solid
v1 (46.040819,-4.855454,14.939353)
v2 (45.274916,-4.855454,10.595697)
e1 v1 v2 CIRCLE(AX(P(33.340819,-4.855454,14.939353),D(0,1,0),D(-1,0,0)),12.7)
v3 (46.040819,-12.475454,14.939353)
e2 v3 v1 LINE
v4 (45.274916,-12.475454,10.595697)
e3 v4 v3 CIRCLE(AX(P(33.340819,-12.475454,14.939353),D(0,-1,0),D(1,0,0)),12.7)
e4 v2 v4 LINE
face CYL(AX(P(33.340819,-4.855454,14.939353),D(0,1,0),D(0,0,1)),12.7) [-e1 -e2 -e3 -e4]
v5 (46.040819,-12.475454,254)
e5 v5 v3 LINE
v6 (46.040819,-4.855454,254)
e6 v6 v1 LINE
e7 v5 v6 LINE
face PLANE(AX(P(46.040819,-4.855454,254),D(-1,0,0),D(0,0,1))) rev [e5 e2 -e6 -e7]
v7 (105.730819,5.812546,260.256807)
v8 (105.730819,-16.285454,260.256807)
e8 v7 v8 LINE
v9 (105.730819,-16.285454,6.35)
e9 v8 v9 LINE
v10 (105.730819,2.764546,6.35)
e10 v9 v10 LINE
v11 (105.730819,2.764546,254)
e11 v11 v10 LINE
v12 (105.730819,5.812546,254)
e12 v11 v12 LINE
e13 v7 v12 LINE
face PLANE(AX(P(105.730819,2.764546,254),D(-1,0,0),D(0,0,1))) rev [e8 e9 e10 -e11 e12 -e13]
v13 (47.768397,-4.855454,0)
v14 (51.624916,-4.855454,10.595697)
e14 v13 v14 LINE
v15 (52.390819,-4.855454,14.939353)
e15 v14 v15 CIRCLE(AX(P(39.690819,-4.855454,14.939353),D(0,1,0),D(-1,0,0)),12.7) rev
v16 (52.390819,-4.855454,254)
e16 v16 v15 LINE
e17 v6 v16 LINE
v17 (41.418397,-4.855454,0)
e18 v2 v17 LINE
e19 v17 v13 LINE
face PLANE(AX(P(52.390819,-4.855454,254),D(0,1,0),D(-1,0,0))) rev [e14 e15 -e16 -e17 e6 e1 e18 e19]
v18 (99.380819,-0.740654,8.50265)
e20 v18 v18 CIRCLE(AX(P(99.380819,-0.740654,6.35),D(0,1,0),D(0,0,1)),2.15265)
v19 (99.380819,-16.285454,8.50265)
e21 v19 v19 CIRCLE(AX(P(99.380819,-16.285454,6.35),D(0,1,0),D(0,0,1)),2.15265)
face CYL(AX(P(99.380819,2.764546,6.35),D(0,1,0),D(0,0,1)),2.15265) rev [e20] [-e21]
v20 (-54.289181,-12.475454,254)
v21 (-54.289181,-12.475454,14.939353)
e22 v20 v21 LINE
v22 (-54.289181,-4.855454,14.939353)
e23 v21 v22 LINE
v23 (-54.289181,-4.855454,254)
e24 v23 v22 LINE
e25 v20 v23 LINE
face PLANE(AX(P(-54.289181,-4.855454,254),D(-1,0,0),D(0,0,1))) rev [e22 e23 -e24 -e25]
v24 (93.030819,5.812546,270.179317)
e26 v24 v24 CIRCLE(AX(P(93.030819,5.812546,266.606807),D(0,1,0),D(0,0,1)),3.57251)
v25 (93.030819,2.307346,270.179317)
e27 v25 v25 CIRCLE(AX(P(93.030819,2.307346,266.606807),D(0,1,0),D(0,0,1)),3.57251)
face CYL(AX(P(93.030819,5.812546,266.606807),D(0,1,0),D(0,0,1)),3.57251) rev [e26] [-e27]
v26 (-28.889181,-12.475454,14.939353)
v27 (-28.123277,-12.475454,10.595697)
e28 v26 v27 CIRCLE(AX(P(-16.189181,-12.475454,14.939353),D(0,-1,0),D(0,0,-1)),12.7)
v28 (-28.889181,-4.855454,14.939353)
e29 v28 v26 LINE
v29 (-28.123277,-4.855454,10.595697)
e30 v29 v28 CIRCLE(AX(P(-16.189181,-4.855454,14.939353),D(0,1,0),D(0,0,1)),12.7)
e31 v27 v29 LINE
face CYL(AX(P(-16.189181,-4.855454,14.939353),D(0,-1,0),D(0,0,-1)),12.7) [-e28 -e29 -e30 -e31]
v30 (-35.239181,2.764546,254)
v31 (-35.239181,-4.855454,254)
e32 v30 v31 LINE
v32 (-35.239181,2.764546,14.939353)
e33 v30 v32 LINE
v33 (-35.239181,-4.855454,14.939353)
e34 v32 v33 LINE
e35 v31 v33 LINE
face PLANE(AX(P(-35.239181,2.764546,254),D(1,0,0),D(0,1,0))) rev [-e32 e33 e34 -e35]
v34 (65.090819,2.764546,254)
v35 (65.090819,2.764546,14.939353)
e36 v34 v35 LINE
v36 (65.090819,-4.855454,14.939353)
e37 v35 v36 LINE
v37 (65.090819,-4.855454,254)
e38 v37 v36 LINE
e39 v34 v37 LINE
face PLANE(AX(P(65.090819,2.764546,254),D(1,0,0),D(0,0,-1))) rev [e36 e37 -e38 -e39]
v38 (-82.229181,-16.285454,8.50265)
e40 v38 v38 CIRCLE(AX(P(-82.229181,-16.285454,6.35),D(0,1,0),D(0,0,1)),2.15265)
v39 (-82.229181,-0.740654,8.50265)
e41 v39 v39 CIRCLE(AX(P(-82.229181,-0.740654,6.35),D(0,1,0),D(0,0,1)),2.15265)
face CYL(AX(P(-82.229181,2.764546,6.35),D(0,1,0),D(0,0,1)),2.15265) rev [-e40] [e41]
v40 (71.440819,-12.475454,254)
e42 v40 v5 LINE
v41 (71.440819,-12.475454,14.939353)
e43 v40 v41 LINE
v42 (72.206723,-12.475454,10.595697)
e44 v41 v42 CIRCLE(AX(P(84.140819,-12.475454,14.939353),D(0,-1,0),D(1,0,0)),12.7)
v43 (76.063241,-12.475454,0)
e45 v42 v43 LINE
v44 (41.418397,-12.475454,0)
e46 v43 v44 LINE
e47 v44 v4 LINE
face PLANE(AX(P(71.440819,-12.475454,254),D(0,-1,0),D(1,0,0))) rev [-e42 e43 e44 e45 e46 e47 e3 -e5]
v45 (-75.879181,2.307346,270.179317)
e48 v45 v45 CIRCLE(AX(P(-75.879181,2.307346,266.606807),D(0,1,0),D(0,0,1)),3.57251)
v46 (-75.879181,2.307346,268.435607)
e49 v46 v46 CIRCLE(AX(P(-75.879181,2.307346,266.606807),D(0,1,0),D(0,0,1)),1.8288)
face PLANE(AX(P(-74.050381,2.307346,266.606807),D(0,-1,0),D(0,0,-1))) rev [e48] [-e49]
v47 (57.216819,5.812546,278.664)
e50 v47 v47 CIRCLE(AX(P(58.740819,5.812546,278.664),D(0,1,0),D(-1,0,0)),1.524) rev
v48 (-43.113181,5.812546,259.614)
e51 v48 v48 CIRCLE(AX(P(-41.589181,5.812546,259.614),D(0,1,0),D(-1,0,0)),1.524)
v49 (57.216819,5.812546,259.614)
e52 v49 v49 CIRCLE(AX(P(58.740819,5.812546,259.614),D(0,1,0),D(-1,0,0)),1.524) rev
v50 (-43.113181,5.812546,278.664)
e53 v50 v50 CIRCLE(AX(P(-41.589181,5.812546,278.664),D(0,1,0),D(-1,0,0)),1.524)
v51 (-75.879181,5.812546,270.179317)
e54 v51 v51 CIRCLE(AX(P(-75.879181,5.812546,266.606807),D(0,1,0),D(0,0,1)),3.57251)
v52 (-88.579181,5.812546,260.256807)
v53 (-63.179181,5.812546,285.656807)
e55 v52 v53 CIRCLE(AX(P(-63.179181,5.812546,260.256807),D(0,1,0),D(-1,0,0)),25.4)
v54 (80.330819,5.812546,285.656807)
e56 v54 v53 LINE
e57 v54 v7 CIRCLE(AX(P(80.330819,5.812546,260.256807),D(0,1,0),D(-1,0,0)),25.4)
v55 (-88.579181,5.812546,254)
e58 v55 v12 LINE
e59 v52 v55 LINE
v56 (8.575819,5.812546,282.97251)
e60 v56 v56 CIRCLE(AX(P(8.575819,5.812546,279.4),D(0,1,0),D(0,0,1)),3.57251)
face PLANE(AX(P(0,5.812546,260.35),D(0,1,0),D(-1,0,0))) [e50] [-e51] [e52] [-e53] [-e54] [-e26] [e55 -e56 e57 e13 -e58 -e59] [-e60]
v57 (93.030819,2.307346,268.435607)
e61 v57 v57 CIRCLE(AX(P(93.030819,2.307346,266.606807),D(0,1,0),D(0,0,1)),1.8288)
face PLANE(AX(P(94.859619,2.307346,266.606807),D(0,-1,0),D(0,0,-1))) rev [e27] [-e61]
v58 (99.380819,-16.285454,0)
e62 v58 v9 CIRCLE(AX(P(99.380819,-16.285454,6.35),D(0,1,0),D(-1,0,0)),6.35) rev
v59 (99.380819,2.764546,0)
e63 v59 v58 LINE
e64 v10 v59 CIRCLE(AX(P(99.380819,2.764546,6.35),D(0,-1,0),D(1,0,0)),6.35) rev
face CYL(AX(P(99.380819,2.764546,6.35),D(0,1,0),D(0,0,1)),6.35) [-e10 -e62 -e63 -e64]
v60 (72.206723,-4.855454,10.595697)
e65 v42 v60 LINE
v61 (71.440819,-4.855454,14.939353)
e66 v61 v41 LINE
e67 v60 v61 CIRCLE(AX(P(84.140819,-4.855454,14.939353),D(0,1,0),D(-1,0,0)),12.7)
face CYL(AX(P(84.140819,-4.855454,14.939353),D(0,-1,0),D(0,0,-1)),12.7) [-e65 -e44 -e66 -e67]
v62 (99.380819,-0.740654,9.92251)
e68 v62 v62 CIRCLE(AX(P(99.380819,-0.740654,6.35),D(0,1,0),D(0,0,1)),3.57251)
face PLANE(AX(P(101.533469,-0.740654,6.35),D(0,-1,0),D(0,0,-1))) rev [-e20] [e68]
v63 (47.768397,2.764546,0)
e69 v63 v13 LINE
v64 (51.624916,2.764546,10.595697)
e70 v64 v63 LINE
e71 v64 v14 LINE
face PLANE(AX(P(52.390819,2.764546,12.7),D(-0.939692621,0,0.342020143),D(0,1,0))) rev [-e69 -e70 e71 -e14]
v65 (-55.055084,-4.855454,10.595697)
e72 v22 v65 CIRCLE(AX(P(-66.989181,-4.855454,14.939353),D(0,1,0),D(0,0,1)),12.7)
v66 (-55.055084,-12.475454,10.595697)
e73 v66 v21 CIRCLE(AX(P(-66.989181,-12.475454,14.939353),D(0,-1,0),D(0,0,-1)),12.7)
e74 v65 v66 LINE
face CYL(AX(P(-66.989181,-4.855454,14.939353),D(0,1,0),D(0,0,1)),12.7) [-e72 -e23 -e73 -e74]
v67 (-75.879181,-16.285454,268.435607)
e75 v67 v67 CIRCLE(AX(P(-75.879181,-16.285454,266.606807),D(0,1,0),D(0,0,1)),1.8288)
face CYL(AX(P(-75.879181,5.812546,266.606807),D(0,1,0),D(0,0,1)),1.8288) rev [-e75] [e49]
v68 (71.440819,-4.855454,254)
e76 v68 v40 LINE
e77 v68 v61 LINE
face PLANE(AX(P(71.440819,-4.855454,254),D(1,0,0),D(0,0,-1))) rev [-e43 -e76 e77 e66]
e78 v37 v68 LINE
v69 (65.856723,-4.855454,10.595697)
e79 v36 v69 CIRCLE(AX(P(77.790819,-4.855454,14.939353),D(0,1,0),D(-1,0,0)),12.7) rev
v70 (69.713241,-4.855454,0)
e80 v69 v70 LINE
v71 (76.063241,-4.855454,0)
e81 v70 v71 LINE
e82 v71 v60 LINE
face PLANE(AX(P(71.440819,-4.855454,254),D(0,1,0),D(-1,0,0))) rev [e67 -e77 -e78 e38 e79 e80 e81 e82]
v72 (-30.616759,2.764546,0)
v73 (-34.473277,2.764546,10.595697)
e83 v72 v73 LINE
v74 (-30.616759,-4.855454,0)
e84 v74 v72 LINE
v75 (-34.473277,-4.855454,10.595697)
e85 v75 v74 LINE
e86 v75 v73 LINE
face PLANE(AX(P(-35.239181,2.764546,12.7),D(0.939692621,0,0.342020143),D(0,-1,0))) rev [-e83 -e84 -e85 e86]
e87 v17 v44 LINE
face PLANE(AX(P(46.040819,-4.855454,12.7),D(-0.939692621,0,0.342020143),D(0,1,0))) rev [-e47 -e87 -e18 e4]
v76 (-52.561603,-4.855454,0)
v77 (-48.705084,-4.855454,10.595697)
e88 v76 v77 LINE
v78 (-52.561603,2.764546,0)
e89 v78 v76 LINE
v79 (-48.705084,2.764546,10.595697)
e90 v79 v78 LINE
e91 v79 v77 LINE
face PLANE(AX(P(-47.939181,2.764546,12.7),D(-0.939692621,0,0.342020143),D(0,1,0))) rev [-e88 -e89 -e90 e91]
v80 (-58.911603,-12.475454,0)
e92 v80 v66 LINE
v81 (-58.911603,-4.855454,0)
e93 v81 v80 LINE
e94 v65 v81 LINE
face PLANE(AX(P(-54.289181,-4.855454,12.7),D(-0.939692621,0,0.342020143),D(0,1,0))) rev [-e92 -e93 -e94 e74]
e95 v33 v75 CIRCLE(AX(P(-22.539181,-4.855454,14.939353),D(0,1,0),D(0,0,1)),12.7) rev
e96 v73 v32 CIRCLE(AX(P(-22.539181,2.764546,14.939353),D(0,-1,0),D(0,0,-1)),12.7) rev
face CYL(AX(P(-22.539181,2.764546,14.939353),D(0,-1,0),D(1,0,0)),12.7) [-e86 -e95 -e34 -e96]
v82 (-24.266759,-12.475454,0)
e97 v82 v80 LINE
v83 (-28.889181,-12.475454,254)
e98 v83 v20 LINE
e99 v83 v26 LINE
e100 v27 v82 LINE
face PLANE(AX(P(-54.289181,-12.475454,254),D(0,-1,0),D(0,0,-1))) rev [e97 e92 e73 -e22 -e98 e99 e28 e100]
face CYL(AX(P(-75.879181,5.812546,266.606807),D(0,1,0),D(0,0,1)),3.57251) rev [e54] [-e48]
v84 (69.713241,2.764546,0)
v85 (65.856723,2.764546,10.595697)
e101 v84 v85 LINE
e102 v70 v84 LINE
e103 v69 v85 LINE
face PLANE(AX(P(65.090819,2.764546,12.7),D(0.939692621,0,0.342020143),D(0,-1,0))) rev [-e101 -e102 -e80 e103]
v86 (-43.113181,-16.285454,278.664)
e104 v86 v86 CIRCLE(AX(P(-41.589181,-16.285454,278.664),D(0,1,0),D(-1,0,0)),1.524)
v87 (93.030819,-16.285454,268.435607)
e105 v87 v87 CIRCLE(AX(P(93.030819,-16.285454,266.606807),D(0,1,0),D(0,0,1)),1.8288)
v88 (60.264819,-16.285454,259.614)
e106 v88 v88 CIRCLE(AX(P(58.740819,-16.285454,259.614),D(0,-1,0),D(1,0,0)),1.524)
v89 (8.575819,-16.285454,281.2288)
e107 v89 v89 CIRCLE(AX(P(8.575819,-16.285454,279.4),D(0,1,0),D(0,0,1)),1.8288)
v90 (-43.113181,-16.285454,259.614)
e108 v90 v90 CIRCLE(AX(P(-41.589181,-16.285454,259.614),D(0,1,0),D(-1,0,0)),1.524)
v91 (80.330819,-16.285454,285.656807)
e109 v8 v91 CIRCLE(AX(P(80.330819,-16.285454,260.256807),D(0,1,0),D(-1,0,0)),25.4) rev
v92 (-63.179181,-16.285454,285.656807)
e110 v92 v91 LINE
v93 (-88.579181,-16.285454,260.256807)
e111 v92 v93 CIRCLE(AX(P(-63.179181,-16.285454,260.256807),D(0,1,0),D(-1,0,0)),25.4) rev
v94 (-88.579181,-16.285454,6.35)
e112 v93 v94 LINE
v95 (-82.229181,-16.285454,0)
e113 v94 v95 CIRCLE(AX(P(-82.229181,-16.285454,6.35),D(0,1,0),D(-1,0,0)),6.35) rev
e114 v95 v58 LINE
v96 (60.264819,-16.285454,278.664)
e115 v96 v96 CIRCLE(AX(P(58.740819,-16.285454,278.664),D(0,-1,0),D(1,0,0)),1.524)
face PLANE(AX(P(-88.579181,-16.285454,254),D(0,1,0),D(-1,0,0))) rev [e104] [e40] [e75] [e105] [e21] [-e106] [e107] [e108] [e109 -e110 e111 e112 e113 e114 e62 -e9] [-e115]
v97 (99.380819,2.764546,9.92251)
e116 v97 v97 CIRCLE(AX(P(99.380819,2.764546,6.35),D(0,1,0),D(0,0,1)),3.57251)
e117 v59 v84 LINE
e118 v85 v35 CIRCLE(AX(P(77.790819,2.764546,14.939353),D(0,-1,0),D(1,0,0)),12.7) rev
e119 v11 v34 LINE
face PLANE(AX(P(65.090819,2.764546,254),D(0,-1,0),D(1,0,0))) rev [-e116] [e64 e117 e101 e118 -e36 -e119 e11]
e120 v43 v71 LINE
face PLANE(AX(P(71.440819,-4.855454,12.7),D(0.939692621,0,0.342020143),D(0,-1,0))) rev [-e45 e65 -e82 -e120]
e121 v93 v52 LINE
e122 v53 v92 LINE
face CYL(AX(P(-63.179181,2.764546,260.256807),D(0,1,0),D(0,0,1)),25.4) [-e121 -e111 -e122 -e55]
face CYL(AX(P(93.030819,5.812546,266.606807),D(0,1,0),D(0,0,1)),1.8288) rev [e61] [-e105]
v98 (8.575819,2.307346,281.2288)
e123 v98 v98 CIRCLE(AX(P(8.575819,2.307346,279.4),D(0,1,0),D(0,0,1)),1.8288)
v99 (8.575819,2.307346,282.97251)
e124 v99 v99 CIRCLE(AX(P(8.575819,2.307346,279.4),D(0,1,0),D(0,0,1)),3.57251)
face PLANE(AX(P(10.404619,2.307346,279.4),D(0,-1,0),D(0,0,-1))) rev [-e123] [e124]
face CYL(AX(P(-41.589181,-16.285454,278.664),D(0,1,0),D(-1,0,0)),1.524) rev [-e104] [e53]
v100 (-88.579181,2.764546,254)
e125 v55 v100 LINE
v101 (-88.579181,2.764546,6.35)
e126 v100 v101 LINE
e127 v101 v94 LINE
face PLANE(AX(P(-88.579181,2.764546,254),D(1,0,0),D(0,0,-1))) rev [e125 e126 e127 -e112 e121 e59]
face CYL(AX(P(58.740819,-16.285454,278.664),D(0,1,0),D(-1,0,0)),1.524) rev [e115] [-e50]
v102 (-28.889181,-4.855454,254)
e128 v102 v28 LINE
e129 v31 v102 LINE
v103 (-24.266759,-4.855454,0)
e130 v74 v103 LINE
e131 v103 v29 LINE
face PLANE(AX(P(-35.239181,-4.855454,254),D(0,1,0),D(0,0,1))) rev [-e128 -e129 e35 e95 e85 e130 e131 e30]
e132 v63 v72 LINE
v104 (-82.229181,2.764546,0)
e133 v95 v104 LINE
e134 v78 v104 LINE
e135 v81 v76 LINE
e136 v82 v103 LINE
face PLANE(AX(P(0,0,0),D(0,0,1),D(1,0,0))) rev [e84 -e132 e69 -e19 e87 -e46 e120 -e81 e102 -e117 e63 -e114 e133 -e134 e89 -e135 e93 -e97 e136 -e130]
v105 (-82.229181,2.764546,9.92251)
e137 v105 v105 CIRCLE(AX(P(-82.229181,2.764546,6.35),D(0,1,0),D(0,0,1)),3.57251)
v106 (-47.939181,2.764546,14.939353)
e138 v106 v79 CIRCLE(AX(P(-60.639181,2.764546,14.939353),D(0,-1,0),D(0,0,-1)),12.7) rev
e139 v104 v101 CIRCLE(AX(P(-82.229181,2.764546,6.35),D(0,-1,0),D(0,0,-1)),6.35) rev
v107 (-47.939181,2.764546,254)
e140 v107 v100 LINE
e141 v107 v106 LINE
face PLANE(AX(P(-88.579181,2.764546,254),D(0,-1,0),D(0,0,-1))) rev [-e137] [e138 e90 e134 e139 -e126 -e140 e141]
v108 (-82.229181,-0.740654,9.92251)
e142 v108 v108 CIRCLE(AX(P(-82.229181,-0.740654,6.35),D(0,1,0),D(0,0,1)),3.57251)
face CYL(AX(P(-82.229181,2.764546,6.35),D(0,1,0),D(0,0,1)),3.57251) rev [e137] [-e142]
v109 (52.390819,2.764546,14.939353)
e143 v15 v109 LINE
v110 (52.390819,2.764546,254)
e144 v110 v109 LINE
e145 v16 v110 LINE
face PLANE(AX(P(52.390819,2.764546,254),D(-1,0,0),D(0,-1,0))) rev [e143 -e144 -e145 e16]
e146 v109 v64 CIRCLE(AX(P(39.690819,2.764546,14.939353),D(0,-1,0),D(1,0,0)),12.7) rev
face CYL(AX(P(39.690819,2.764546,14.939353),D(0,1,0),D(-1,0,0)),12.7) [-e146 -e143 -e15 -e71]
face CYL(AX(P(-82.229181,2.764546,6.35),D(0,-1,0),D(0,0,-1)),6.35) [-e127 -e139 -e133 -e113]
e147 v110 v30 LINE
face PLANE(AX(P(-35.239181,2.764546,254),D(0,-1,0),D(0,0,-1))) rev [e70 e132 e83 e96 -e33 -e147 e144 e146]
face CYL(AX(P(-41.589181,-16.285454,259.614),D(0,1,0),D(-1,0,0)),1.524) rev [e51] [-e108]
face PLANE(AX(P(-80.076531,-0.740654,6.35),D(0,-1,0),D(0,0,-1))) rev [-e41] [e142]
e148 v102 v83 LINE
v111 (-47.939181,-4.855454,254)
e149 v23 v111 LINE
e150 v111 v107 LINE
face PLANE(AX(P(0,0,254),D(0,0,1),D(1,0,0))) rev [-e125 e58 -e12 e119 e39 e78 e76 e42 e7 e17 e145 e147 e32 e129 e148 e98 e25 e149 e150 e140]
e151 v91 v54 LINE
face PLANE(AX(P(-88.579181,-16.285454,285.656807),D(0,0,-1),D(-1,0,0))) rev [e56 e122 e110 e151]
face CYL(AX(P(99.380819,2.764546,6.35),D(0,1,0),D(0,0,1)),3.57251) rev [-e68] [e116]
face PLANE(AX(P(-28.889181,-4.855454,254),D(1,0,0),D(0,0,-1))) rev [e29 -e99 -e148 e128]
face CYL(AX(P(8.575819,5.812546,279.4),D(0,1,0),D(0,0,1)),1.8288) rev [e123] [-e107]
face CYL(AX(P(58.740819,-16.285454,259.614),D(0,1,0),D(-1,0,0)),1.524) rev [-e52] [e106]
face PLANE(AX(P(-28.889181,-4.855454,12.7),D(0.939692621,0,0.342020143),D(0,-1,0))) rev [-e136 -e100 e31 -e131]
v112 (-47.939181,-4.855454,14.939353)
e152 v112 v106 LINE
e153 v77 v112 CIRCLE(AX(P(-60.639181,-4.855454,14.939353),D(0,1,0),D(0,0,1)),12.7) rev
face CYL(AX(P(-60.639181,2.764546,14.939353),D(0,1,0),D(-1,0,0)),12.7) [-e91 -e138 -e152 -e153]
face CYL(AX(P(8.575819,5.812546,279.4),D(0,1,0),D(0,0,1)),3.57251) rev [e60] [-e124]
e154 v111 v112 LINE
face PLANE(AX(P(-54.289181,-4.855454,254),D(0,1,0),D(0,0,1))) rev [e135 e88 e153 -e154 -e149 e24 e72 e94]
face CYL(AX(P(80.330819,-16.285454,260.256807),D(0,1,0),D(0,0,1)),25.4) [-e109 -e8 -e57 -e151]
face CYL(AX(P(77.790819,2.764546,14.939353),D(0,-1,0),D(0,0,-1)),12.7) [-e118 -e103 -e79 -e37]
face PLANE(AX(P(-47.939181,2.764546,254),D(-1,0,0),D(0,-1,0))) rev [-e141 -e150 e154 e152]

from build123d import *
from OCP.BRepFilletAPI import BRepFilletAPI_MakeChamfer

# Parameters (mm, degrees)
BOSS_EXTRUDE1_DEPTH                            = 254
SKETCH2_W                                      = 194.31
SKETCH2_H                                      = 44.45
SKETCH2_W_2                                    = 35.56
SKETCH2_H_2                                    = 17.018
BOSS_EXTRUDE2_DEPTH                            = 6.35
BOSS_EXTRUDE3_DEPTH                            = 44.45
CUT_EXTRUDE1_DEPTH                             = 324.390875065
CUT_EXTRUDE1_DEPTH_BACK                        = 324.390875065
SKETCH5_R                                      = 1.524
FILLET1_R                                      = 3.175
FILLET2_R                                      = 3.175
CBORE_FOR_6_SOCKET_HEAD_CAP_SCREW1_D           = 4.3053
CBORE_FOR_6_SOCKET_HEAD_CAP_SCREW1_CBORE_D     = 7.14502
CBORE_FOR_6_SOCKET_HEAD_CAP_SCREW1_CBORE_DEPTH = 3.5052
CHAMFER1_SIZE                                  = 12.7
CHAMFER1_SIZE2                                 = 4.622421975
FILLET4_R                                      = 12.7
FILLET6_R                                      = 6.35
FILLET7_R                                      = 2.54
CUT_EXTRUDE2_DEPTH                             = 363.564005121
SKETCH13_W                                     = 19.143193239
SKETCH13_H                                     = 43.092698141
CUT_EXTRUDE3_DEPTH                             = 362.835089653
FILLET8_R                                      = 25.4
CBORE_FOR_6_SOCKET_HEAD_CAP_SCREW3_D           = 3.6576
CBORE_FOR_6_SOCKET_HEAD_CAP_SCREW3_CBORE_D     = 7.14502
CBORE_FOR_6_SOCKET_HEAD_CAP_SCREW3_CBORE_DEPTH = 3.5052
CBORE_FOR_6_SOCKET_HEAD_CAP_SCREW4_D           = 3.6576
CBORE_FOR_6_SOCKET_HEAD_CAP_SCREW4_CBORE_D     = 7.14502
CBORE_FOR_6_SOCKET_HEAD_CAP_SCREW4_CBORE_DEPTH = 3.5052


with BuildPart() as part:
    # Sketch1 → Boss-Extrude1 (new body)
    with BuildSketch(Plane.XY):
        Polygon((-88.579180599, 2.764546242), (-47.939180599, 2.764546242), (-47.939180599, -4.855453758), (-54.289180599, -4.855453758), (-54.289180599, -12.475453758), (-28.889180599, -12.475453758), (-28.889180599, -4.855453758), (-35.239180599, -4.855453758), (-35.239180599, 2.764546242), (5.400819401, 2.764546242), (5.400819401, 28.164546242), (11.750819401, 28.164546242), (11.750819401, 2.764546242), (52.390819401, 2.764546242), (52.390819401, -4.855453758), (46.040819401, -4.855453758), (46.040819401, -12.475453758), (71.440819401, -12.475453758), (71.440819401, -4.855453758), (65.090819401, -4.855453758), (65.090819401, 2.764546242), (105.730819401, 2.764546242), (105.730819401, -16.285453758), (-88.579180599, -16.285453758), align=None)
    extrude(amount=BOSS_EXTRUDE1_DEPTH)

    # Sketch2 → Boss-Extrude2 (add)
    with BuildSketch(Plane.XY.offset(254)):
        with Locations((8.575819401, 5.939546242)):
            Rectangle(SKETCH2_W, SKETCH2_H)
        with Locations((-41.589180599, 14.321546242)):
            Rectangle(SKETCH2_W_2, SKETCH2_H_2, mode=Mode.SUBTRACT)
        with Locations((58.740819401, 14.321546242)):
            Rectangle(SKETCH2_W_2, SKETCH2_H_2, mode=Mode.SUBTRACT)
    extrude(amount=BOSS_EXTRUDE2_DEPTH)

    # Sketch3 → Boss-Extrude3 (add)
    with BuildSketch(Plane.XY.offset(260.35)):
        Polygon((-88.579180599, 5.812546242), (-88.579180599, -16.285453758), (105.730819401, -16.285453758), (105.730819401, 5.812546242), (76.520819401, 5.812546242), (40.960819401, 5.812546242), (-23.809180599, 5.812546242), (-59.369180599, 5.812546242), align=None)
    extrude(amount=BOSS_EXTRUDE3_DEPTH)

    # Sketch5 → Cut-Extrude1 (cut, two sides: drawn at the far end of the back side and taken through both)
    with BuildSketch(Plane(origin=(0, 5.812546242, 0), x_dir=(1, 0, 0), z_dir=(0, 1, 0)).offset(-CUT_EXTRUDE1_DEPTH_BACK)):
        with Locations(Location((-41.589180599, -259.614, 0), (0, 0, 180))):
            Circle(SKETCH5_R)
        with Locations(Location((-41.589180599, -278.664, 0), (0, 0, 180))):
            Circle(SKETCH5_R)
        with Locations(Location((58.740819401, -259.614, 0), (0, 0, 180))):
            Circle(SKETCH5_R)
        with Locations(Location((58.740819401, -278.664, 0), (0, 0, 180))):
            Circle(SKETCH5_R)
    extrude(amount=CUT_EXTRUDE1_DEPTH + CUT_EXTRUDE1_DEPTH_BACK, mode=Mode.SUBTRACT)

    # Fillet1
    # the kernel refuses this fillet: 3.175 mm, written as the material it takes off along each edge
    with BuildSketch(Plane(origin=(5.400819401, 28.164546242, -7.9375), x_dir=(0, -1, 0), z_dir=(0, 0, 1))) as fillet1_piece_1:
        with BuildLine():
            CenterArc((FILLET1_R, FILLET1_R), FILLET1_R, 180, 90)
            Line((0, FILLET1_R), (0, 0))
            Line((0, 0), (FILLET1_R, 0))
        make_face()
    extrude(amount=261.9375, mode=Mode.SUBTRACT)
    with BuildSketch(Plane(origin=(11.750819401, 28.164546242, -7.9375), x_dir=(0, -1, 0), z_dir=(0, 0, 1))) as fillet1_piece_2:
        with BuildLine():
            CenterArc((FILLET1_R, -FILLET1_R), FILLET1_R, 90, 90)
            Line((0, -FILLET1_R), (0, 0))
            Line((0, 0), (FILLET1_R, 0))
        make_face()
    extrude(amount=261.9375, mode=Mode.SUBTRACT)

    # Fillet2
    # the kernel refuses this fillet: 3.175 mm, written as the material it adds along each edge
    # the kernel refuses this fillet: 3.175 mm, written as the material it takes off along each edge
    with BuildSketch(Plane(origin=(65.343823241, 28.164546242, 260.35), x_dir=(0, -1, 0), z_dir=(-1, 0, 0))) as fillet2_2_piece_1:
        with BuildLine():
            CenterArc((FILLET2_R, -FILLET2_R), FILLET2_R, 90, 90)
            Line((0, -FILLET2_R), (0, 0))
            Line((0, 0), (FILLET2_R, 0))
        make_face()
    extrude(amount=113.536007681, mode=Mode.SUBTRACT)
    with BuildSketch(Plane(origin=(113.668319401, 28.164546242, 260.35), x_dir=(0, -1, 0), z_dir=(-1, 0, 0)), Plane(origin=(-34.986176759, 28.164546242, 260.35), x_dir=(0, -1, 0), z_dir=(-1, 0, 0))) as fillet2_2_piece_2:
        with BuildLine():
            CenterArc((FILLET2_R, -FILLET2_R), FILLET2_R, 90, 90)
            Line((0, -FILLET2_R), (0, 0))
            Line((0, 0), (FILLET2_R, 0))
        make_face()
    extrude(amount=61.53050384, mode=Mode.SUBTRACT)
    with BuildSketch(Plane(origin=(-96.516680599, 28.164546242, 254), x_dir=(0, -1, 0), z_dir=(1, 0, 0))) as fillet2_2_piece_3_section:
        with BuildLine():
            CenterArc((FILLET2_R, -FILLET2_R), FILLET2_R, 90, 90)
            Line((0, -FILLET2_R), (0, 0))
            Line((0, 0), (FILLET2_R, 0))
        make_face()
    fillet2_2_piece_3 = extrude(amount=105.0925, mode=Mode.PRIVATE)
    fillet2_2_piece_3 = fillet2_2_piece_3 - Plane(origin=(8.575819401, 24.989546242, 254.709193206), x_dir=(0, -1, 0), z_dir=(0, 0, -1)) * Cylinder(3.175, 223, mode=Mode.PRIVATE)
    add(fillet2_2_piece_3, mode=Mode.SUBTRACT)

    # CBORE for #6 Socket Head Cap Screw1 (through all)
    with Locations(Plane(origin=(0, 2.764546242, 0), x_dir=(1, 0, 0), z_dir=(0, 1, 0))):
        with Locations((99.380819401, -6.35), (-82.229180599, -6.35)):
            CounterBoreHole(CBORE_FOR_6_SOCKET_HEAD_CAP_SCREW1_D / 2, CBORE_FOR_6_SOCKET_HEAD_CAP_SCREW1_CBORE_D / 2, CBORE_FOR_6_SOCKET_HEAD_CAP_SCREW1_CBORE_DEPTH)

    # Chamfer1: one chamfer whose edges measure the first distance from different faces: ONE call of the kernel's chamfer builder (chamfer() names one face for all edges)
    chamfer1_edges_1 = [part.edges().sort_by_distance(p)[0] for p in [
        (-47.939180599, -1.045453758, 0),
    ]]
    chamfer1_side_1 = [part.faces().sort_by_distance(p)[0] for p in [
        (-47.939180599, -1.045453758, 127),
    ]]
    chamfer1_edges_2 = [part.edges().sort_by_distance(p)[0] for p in [
        (-54.289180599, -8.665453758, 0),
    ]]
    chamfer1_side_2 = [part.faces().sort_by_distance(p)[0] for p in [
        (-54.289180599, -8.665453758, 127),
    ]]
    chamfer1_edges_3 = [part.edges().sort_by_distance(p)[0] for p in [
        (-28.889180599, -8.665453758, 0),
    ]]
    chamfer1_side_3 = [part.faces().sort_by_distance(p)[0] for p in [
        (-28.889180599, -8.665453758, 127),
    ]]
    chamfer1_edges_4 = [part.edges().sort_by_distance(p)[0] for p in [
        (-35.239180599, -1.045453758, 0),
    ]]
    chamfer1_side_4 = [part.faces().sort_by_distance(p)[0] for p in [
        (-35.239180599, -1.045453758, 127),
    ]]
    chamfer1_edges_5 = [part.edges().sort_by_distance(p)[0] for p in [
        (52.390819401, -1.045453758, 0),
    ]]
    chamfer1_side_5 = [part.faces().sort_by_distance(p)[0] for p in [
        (52.390819401, -1.045453758, 127),
    ]]
    chamfer1_edges_6 = [part.edges().sort_by_distance(p)[0] for p in [
        (46.040819401, -8.665453758, 0),
    ]]
    chamfer1_side_6 = [part.faces().sort_by_distance(p)[0] for p in [
        (46.040819401, -8.665453758, 127),
    ]]
    chamfer1_edges_7 = [part.edges().sort_by_distance(p)[0] for p in [
        (71.440819401, -8.665453758, 0),
    ]]
    chamfer1_side_7 = [part.faces().sort_by_distance(p)[0] for p in [
        (71.440819401, -8.665453758, 127),
    ]]
    chamfer1_edges_8 = [part.edges().sort_by_distance(p)[0] for p in [
        (65.090819401, -1.045453758, 0),
    ]]
    chamfer1_side_8 = [part.faces().sort_by_distance(p)[0] for p in [
        (65.090819401, -1.045453758, 127),
    ]]
    chamfer1 = BRepFilletAPI_MakeChamfer(part.part.solid().wrapped)
    for e in chamfer1_edges_1:
        chamfer1.Add(CHAMFER1_SIZE, CHAMFER1_SIZE2, e.wrapped, chamfer1_side_1[0].wrapped)  # the first distance lies on this face
    for e in chamfer1_edges_2:
        chamfer1.Add(CHAMFER1_SIZE, CHAMFER1_SIZE2, e.wrapped, chamfer1_side_2[0].wrapped)  # the first distance lies on this face
    for e in chamfer1_edges_3:
        chamfer1.Add(CHAMFER1_SIZE, CHAMFER1_SIZE2, e.wrapped, chamfer1_side_3[0].wrapped)  # the first distance lies on this face
    for e in chamfer1_edges_4:
        chamfer1.Add(CHAMFER1_SIZE, CHAMFER1_SIZE2, e.wrapped, chamfer1_side_4[0].wrapped)  # the first distance lies on this face
    for e in chamfer1_edges_5:
        chamfer1.Add(CHAMFER1_SIZE, CHAMFER1_SIZE2, e.wrapped, chamfer1_side_5[0].wrapped)  # the first distance lies on this face
    for e in chamfer1_edges_6:
        chamfer1.Add(CHAMFER1_SIZE, CHAMFER1_SIZE2, e.wrapped, chamfer1_side_6[0].wrapped)  # the first distance lies on this face
    for e in chamfer1_edges_7:
        chamfer1.Add(CHAMFER1_SIZE, CHAMFER1_SIZE2, e.wrapped, chamfer1_side_7[0].wrapped)  # the first distance lies on this face
    for e in chamfer1_edges_8:
        chamfer1.Add(CHAMFER1_SIZE, CHAMFER1_SIZE2, e.wrapped, chamfer1_side_8[0].wrapped)  # the first distance lies on this face
    add(Compound.cast(chamfer1.Shape()), mode=Mode.REPLACE)

    # Fillet4
    fillet4_edges = [part.edges().sort_by_distance(p)[0] for p in [
        (-28.889180599, -8.665453758, 12.7),
        (-35.239180599, -1.045453758, 12.7),
        (-47.939180599, -1.045453758, 12.7),
        (-54.289180599, -8.665453758, 12.7),
        (52.390819401, -1.045453758, 12.7),
        (46.040819401, -8.665453758, 12.7),
        (71.440819401, -8.665453758, 12.7),
        (65.090819401, -1.045453758, 12.7),
    ]]
    fillet(fillet4_edges, radius=FILLET4_R)

    # Fillet6
    fillet6_edges = [part.edges().sort_by_distance(p)[0] for p in [
        (105.730819401, -6.760453758, 0),
        (-88.579180599, -6.760453758, 0),
    ]]
    fillet(fillet6_edges, radius=FILLET6_R)

    # Fillet7
    fillet7_edges = [part.edges().sort_by_distance(p)[0] for p in [
        (5.400819401, 13.877046242, 0),
        (8.575819401, 28.164546242, 0),
        (11.750819401, 13.877046242, 0),
    ]]
    fillet(fillet7_edges, radius=FILLET7_R)

    # Sketch8 → Cut-Extrude2 (cut, through all)
    with BuildSketch(Plane(origin=(105.730819401, 0, 0), x_dir=(0, 0, -1), z_dir=(1, 0, 0))):
        Polygon((-254, 2.764546242), (3.999834261, 2.764546242), (3.999834261, 41.93274121), (-234.463494025, 41.93274121), (-234.463494025, 51.374436441), (-260.35, 51.374436441), (-260.35, 5.812546242), (-254, 5.812546242), align=None)
    extrude(amount=-CUT_EXTRUDE2_DEPTH, mode=Mode.SUBTRACT)

    # Sketch13 → Cut-Extrude3 (cut, through all)
    with BuildSketch(Plane(origin=(105.730819401, 0, 0), x_dir=(0, 0, -1), z_dir=(1, 0, 0))):
        with Locations((-295.228403381, 5.260895312)):
            Rectangle(SKETCH13_W, SKETCH13_H)
    extrude(amount=-CUT_EXTRUDE3_DEPTH, mode=Mode.SUBTRACT)

    # Fillet8
    fillet8_edges = [part.edges().sort_by_distance(p)[0] for p in [
        (-88.579180599, -5.236453758, 285.656806761),
        (105.730819401, -5.236453758, 285.656806761),
    ]]
    fillet(fillet8_edges, radius=FILLET8_R)

    # CBORE for #6 Socket Head Cap Screw3 (through all)
    with Locations(Plane(origin=(0, 5.812546242, 0), x_dir=(1, 0, 0), z_dir=(0, 1, 0))):
        with Locations((8.575819401, -279.4)):
            CounterBoreHole(CBORE_FOR_6_SOCKET_HEAD_CAP_SCREW3_D / 2, CBORE_FOR_6_SOCKET_HEAD_CAP_SCREW3_CBORE_D / 2, CBORE_FOR_6_SOCKET_HEAD_CAP_SCREW3_CBORE_DEPTH)

    # CBORE for #6 Socket Head Cap Screw4 (through all)
    with Locations(Plane(origin=(0, 5.812546242, 0), x_dir=(1, 0, 0), z_dir=(0, 1, 0))):
        with Locations((93.030819401, -266.606806761), (-75.879180599, -266.606806761)):
            CounterBoreHole(CBORE_FOR_6_SOCKET_HEAD_CAP_SCREW4_D / 2, CBORE_FOR_6_SOCKET_HEAD_CAP_SCREW4_CBORE_D / 2, CBORE_FOR_6_SOCKET_HEAD_CAP_SCREW4_CBORE_DEPTH)


solid = part.part
